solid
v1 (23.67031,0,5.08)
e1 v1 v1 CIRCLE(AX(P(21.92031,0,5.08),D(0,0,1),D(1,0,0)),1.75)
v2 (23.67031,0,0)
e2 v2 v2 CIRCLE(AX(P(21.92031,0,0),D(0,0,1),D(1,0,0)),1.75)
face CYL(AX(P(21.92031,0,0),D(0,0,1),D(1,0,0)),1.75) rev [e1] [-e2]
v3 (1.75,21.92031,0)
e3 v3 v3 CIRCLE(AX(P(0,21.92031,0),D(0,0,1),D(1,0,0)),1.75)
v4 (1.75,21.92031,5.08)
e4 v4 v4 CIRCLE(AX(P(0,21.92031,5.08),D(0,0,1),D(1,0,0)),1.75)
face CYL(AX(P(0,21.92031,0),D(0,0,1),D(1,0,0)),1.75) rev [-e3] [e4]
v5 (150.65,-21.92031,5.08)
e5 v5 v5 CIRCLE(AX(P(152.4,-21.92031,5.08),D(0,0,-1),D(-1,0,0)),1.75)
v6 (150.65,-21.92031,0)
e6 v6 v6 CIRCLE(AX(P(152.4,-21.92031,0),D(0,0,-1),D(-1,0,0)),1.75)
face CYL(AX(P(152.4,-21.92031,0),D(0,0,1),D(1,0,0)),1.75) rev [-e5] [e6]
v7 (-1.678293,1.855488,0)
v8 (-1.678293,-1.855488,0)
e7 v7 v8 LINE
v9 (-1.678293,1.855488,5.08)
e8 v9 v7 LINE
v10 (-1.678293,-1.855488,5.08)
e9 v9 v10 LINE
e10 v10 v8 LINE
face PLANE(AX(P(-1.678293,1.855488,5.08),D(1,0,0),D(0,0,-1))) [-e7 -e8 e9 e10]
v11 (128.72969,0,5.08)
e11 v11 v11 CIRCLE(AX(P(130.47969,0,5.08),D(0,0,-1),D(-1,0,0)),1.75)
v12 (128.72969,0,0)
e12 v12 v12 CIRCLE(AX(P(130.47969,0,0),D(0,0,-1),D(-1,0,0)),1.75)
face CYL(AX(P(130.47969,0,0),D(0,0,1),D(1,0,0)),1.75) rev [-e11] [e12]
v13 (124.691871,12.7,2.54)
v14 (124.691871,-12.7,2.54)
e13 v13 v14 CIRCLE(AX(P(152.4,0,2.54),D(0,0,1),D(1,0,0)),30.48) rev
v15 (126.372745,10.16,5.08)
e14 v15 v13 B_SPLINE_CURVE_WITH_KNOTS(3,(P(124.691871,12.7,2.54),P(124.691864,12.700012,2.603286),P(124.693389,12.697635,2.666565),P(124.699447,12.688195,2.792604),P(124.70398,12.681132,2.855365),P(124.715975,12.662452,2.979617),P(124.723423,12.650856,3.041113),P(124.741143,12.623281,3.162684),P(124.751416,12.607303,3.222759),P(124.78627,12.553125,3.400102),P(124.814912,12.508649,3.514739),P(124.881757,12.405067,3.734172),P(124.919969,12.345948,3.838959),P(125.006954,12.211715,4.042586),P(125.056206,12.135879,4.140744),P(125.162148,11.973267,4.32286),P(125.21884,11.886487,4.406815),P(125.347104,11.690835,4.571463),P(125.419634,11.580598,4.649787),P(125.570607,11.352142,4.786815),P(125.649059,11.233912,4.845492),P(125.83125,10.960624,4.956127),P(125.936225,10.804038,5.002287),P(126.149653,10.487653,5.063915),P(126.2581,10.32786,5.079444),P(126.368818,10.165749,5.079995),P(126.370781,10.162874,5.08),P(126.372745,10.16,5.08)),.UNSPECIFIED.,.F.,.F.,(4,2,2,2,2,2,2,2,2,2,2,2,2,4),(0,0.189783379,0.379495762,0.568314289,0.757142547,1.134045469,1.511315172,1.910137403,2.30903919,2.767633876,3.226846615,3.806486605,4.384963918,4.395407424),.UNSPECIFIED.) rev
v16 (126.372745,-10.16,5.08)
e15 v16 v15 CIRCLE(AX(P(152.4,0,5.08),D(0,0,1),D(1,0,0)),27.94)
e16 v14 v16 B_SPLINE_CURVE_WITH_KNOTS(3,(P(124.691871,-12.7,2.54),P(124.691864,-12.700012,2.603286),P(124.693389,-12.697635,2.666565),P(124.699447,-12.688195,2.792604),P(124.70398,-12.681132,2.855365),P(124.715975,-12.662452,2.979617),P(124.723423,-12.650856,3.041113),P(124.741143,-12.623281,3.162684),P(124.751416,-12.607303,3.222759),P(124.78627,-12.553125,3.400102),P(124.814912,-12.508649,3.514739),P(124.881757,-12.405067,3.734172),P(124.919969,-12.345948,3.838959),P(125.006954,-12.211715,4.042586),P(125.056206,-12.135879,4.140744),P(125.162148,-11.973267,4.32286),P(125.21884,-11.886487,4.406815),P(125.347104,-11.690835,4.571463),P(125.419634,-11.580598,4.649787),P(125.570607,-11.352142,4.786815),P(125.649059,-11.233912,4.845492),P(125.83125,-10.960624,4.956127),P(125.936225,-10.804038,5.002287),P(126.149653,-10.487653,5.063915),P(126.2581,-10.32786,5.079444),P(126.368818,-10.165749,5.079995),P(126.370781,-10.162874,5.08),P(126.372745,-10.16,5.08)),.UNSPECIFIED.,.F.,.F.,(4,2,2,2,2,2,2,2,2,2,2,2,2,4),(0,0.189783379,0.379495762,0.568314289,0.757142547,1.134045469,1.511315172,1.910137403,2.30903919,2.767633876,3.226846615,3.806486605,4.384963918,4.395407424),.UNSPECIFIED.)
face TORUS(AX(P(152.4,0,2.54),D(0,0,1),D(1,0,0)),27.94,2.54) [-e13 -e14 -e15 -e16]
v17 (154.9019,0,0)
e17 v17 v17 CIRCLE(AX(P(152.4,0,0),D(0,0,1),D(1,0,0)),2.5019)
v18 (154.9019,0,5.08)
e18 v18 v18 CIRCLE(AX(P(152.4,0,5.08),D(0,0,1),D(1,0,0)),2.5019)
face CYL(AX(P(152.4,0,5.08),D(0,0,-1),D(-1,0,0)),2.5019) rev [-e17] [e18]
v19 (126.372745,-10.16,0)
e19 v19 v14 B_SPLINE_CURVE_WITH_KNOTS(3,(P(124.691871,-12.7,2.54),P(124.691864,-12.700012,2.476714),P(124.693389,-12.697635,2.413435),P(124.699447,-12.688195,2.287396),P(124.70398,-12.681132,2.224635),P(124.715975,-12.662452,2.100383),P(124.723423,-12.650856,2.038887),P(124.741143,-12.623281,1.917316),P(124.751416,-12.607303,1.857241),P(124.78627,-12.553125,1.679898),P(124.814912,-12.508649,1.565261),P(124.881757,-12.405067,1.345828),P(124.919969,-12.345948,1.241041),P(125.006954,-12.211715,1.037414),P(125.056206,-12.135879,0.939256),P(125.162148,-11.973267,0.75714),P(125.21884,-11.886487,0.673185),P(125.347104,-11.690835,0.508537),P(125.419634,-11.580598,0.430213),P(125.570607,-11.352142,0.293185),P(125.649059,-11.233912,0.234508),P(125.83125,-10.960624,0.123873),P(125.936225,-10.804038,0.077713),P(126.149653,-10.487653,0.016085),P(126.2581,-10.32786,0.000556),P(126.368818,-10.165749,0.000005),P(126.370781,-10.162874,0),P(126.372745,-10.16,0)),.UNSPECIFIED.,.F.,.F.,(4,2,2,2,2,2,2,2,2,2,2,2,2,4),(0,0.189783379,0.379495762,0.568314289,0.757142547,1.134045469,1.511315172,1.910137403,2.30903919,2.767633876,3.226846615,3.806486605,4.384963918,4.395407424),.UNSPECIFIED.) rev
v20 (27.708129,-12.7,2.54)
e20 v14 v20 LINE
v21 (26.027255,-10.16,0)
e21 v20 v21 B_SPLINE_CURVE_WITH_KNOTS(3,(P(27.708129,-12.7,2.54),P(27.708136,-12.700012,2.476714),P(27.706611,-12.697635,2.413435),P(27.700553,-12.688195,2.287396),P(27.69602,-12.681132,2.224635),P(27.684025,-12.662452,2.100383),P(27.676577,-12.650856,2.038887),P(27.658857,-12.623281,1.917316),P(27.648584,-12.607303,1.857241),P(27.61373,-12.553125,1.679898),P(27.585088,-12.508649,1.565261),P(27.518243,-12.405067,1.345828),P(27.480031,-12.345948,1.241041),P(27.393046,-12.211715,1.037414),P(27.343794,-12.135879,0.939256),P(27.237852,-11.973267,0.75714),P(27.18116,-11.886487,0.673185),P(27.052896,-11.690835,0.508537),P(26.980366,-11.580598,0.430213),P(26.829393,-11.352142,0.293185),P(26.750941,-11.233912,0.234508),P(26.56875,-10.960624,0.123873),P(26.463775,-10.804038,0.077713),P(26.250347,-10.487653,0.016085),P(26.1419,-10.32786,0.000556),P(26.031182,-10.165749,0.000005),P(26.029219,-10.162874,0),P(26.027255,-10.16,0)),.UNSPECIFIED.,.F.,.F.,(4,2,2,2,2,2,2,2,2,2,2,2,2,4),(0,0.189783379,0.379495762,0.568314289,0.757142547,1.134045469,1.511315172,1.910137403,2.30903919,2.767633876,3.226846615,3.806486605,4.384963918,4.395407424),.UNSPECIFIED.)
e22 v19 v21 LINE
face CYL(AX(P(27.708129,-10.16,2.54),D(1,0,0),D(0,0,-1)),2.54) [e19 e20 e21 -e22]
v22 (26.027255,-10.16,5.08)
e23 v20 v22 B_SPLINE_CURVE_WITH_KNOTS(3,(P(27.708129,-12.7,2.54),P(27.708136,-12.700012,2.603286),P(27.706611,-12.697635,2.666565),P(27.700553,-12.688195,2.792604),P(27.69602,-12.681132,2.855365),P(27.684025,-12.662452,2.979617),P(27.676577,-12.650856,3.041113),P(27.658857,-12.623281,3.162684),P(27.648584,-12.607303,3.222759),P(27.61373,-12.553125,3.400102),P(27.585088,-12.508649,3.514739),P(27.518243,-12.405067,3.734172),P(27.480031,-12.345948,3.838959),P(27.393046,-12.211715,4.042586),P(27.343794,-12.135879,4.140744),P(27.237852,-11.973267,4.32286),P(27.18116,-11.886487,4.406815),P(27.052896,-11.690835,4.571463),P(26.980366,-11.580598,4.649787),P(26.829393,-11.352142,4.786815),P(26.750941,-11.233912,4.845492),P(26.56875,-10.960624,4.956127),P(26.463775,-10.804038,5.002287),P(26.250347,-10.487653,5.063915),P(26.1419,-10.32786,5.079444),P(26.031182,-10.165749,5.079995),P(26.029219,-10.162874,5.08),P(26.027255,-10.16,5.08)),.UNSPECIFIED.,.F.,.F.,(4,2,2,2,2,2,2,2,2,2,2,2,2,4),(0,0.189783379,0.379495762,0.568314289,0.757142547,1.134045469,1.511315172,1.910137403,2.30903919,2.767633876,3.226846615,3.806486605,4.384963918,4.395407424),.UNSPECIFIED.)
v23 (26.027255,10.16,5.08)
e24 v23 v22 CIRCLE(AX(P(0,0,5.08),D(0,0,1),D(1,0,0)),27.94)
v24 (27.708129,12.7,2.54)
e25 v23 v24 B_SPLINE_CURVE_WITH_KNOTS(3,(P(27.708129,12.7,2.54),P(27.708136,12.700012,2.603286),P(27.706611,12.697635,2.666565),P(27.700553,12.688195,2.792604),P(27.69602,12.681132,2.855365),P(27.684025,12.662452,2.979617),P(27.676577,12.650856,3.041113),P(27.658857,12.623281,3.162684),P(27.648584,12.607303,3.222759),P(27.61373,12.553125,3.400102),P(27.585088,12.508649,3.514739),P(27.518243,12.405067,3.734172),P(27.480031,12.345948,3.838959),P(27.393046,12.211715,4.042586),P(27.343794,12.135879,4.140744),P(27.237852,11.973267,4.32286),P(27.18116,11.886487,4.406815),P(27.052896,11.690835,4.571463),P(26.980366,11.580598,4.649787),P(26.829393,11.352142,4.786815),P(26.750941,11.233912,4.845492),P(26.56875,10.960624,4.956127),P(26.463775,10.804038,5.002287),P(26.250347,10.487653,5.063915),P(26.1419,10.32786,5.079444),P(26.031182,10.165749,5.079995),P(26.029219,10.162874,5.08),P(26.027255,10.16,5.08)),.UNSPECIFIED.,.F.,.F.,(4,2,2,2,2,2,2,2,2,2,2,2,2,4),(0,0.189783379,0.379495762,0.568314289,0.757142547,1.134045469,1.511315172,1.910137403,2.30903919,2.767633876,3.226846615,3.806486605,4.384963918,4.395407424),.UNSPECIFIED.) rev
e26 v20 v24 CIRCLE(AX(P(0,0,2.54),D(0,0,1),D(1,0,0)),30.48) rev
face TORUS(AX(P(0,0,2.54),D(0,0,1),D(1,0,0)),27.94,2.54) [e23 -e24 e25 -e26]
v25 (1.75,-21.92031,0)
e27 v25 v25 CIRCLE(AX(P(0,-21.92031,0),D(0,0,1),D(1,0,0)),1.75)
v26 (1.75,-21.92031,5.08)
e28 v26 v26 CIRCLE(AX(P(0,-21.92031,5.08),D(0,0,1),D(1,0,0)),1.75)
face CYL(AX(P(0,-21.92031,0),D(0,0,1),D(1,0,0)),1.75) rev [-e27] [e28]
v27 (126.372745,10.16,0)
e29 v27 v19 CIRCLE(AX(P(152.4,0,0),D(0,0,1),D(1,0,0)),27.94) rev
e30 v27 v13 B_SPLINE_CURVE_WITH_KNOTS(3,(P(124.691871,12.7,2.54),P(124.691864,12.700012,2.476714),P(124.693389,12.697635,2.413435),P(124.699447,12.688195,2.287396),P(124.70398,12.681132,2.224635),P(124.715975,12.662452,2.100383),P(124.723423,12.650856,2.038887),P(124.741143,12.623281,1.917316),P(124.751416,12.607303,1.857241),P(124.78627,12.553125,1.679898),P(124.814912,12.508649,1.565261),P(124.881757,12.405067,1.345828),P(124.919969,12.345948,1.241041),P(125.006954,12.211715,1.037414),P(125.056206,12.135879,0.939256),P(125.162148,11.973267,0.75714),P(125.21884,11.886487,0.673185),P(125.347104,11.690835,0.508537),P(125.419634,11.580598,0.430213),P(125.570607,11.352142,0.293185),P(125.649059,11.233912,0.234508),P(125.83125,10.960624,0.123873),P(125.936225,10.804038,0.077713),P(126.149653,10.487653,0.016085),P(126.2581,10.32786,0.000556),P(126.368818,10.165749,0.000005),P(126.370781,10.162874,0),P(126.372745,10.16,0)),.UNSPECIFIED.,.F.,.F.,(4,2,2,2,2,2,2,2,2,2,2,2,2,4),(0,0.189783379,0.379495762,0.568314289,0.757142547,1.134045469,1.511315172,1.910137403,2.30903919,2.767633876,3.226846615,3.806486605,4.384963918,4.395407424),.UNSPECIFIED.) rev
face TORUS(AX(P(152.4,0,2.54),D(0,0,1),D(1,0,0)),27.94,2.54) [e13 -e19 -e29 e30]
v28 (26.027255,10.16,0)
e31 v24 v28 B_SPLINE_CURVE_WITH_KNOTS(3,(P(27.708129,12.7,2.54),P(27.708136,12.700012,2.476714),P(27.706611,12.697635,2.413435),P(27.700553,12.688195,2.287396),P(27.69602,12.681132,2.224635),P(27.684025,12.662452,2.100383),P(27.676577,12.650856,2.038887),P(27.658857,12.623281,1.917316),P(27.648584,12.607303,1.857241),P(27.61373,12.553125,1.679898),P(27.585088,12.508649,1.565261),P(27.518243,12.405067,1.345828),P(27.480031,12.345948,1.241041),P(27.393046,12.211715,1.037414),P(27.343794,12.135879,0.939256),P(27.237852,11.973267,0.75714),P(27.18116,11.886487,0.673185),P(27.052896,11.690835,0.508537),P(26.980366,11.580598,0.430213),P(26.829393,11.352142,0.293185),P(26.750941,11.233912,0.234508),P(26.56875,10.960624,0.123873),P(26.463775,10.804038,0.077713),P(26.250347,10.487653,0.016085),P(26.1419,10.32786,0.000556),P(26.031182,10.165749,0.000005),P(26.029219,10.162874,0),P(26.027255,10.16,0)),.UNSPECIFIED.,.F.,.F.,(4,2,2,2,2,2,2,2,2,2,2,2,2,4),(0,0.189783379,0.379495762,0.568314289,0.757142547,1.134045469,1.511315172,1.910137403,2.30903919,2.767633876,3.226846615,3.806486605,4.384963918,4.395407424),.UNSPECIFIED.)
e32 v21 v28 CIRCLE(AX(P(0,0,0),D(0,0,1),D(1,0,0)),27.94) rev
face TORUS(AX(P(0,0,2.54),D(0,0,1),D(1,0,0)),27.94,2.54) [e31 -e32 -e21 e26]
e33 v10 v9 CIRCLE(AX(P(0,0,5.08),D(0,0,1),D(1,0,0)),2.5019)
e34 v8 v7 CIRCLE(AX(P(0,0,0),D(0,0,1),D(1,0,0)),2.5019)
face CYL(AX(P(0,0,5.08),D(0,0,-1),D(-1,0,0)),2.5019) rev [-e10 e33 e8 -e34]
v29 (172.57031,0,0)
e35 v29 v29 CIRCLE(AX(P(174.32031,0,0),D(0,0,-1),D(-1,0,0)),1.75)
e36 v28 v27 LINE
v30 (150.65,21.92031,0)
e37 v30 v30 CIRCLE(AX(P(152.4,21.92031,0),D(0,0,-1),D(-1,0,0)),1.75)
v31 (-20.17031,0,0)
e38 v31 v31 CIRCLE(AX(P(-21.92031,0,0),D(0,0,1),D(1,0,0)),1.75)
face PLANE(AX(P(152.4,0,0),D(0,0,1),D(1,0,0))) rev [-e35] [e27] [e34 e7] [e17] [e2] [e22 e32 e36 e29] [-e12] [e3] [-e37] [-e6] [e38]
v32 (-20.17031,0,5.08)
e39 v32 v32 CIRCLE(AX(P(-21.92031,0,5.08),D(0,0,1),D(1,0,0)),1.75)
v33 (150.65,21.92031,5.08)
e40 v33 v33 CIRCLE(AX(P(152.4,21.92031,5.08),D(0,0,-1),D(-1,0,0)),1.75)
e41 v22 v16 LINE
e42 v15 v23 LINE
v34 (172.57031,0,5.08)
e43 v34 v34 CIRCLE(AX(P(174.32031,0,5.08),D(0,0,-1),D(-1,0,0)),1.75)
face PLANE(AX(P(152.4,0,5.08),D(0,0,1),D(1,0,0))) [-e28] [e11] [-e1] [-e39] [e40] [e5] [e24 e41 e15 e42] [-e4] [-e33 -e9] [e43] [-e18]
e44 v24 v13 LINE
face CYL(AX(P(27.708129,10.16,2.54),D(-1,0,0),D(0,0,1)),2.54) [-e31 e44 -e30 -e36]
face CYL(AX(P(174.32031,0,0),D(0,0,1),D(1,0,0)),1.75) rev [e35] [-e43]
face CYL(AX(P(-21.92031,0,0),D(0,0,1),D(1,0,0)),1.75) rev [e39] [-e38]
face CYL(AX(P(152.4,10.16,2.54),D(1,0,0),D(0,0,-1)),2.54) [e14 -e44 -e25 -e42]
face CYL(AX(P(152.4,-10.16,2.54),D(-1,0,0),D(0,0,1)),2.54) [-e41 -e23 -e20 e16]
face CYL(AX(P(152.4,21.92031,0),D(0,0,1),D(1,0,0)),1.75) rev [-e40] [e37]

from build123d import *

# Parameters (mm, degrees)
SKETCH1_R           = 2.5019
BOSS_EXTRUDE1_DEPTH = 5.08
FILLET1_R           = 2.54
FILLET2_R           = 2.54
SKETCH2_R           = 1.75
CUT_EXTRUDE1_DEPTH  = 186.472184555


with BuildPart() as part:
    # Sketch1 → Boss-Extrude1 (new body)
    with BuildSketch(Plane.XY):
        with BuildLine():
            Line((27.708128771, -12.7), (124.691871229, -12.7))
            ThreePointArc((124.691871229, -12.7), (182.88, 0), (124.691871229, 12.7))
            Line((124.691871229, 12.7), (27.708128771, 12.7))
            ThreePointArc((27.708128771, 12.7), (-30.48, 0), (27.708128771, -12.7))
        make_face()
        with Locations((152.4, 0)):
            Circle(SKETCH1_R, mode=Mode.SUBTRACT)
        with BuildLine():
            Line((-1.67829283, 1.855488288), (-1.67829283, -1.855488288))
            ThreePointArc((-1.67829283, -1.855488288), (2.5019, 0), (-1.67829283, 1.855488288))
        make_face(mode=Mode.SUBTRACT)
    extrude(amount=BOSS_EXTRUDE1_DEPTH)

    # Fillet1
    fillet1_edges = [part.edges().sort_by_distance(p)[0] for p in [
        (-30.48, 0, 5.08),
        (76.2, -12.7, 5.08),
        (182.88, 0, 5.08),
        (76.2, 12.7, 5.08),
    ]]
    fillet(fillet1_edges, radius=FILLET1_R)

    # Fillet2
    fillet2_edges = [part.edges().sort_by_distance(p)[0] for p in [
        (76.2, -12.7, 0),
        (-30.48, 0, 0),
        (76.2, 12.7, 0),
        (182.88, 0, 0),
    ]]
    fillet(fillet2_edges, radius=FILLET2_R - 0.0001)  # a hair under: the kernel refuses the full size

    # Sketch2 → Cut-Extrude1 (cut, through all)
    with BuildSketch(Plane.XY.offset(5.08)):
        with Locations((21.920310217, 0)):
            Circle(SKETCH2_R)
        with Locations((0, -21.920310217)):
            Circle(SKETCH2_R)
        with Locations((-21.920310217, 0)):
            Circle(SKETCH2_R)
        with Locations((0, 21.920310217)):
            Circle(SKETCH2_R)
    cut_extrude1 = extrude(amount=-CUT_EXTRUDE1_DEPTH, mode=Mode.SUBTRACT)

    # Mirror1: Cut-Extrude1 across plane
    add(cut_extrude1.mirror(Plane(origin=(76.2, 0, 0), x_dir=(0, 0, 1), z_dir=(1, 0, 0))), mode=Mode.SUBTRACT)


solid = part.part
